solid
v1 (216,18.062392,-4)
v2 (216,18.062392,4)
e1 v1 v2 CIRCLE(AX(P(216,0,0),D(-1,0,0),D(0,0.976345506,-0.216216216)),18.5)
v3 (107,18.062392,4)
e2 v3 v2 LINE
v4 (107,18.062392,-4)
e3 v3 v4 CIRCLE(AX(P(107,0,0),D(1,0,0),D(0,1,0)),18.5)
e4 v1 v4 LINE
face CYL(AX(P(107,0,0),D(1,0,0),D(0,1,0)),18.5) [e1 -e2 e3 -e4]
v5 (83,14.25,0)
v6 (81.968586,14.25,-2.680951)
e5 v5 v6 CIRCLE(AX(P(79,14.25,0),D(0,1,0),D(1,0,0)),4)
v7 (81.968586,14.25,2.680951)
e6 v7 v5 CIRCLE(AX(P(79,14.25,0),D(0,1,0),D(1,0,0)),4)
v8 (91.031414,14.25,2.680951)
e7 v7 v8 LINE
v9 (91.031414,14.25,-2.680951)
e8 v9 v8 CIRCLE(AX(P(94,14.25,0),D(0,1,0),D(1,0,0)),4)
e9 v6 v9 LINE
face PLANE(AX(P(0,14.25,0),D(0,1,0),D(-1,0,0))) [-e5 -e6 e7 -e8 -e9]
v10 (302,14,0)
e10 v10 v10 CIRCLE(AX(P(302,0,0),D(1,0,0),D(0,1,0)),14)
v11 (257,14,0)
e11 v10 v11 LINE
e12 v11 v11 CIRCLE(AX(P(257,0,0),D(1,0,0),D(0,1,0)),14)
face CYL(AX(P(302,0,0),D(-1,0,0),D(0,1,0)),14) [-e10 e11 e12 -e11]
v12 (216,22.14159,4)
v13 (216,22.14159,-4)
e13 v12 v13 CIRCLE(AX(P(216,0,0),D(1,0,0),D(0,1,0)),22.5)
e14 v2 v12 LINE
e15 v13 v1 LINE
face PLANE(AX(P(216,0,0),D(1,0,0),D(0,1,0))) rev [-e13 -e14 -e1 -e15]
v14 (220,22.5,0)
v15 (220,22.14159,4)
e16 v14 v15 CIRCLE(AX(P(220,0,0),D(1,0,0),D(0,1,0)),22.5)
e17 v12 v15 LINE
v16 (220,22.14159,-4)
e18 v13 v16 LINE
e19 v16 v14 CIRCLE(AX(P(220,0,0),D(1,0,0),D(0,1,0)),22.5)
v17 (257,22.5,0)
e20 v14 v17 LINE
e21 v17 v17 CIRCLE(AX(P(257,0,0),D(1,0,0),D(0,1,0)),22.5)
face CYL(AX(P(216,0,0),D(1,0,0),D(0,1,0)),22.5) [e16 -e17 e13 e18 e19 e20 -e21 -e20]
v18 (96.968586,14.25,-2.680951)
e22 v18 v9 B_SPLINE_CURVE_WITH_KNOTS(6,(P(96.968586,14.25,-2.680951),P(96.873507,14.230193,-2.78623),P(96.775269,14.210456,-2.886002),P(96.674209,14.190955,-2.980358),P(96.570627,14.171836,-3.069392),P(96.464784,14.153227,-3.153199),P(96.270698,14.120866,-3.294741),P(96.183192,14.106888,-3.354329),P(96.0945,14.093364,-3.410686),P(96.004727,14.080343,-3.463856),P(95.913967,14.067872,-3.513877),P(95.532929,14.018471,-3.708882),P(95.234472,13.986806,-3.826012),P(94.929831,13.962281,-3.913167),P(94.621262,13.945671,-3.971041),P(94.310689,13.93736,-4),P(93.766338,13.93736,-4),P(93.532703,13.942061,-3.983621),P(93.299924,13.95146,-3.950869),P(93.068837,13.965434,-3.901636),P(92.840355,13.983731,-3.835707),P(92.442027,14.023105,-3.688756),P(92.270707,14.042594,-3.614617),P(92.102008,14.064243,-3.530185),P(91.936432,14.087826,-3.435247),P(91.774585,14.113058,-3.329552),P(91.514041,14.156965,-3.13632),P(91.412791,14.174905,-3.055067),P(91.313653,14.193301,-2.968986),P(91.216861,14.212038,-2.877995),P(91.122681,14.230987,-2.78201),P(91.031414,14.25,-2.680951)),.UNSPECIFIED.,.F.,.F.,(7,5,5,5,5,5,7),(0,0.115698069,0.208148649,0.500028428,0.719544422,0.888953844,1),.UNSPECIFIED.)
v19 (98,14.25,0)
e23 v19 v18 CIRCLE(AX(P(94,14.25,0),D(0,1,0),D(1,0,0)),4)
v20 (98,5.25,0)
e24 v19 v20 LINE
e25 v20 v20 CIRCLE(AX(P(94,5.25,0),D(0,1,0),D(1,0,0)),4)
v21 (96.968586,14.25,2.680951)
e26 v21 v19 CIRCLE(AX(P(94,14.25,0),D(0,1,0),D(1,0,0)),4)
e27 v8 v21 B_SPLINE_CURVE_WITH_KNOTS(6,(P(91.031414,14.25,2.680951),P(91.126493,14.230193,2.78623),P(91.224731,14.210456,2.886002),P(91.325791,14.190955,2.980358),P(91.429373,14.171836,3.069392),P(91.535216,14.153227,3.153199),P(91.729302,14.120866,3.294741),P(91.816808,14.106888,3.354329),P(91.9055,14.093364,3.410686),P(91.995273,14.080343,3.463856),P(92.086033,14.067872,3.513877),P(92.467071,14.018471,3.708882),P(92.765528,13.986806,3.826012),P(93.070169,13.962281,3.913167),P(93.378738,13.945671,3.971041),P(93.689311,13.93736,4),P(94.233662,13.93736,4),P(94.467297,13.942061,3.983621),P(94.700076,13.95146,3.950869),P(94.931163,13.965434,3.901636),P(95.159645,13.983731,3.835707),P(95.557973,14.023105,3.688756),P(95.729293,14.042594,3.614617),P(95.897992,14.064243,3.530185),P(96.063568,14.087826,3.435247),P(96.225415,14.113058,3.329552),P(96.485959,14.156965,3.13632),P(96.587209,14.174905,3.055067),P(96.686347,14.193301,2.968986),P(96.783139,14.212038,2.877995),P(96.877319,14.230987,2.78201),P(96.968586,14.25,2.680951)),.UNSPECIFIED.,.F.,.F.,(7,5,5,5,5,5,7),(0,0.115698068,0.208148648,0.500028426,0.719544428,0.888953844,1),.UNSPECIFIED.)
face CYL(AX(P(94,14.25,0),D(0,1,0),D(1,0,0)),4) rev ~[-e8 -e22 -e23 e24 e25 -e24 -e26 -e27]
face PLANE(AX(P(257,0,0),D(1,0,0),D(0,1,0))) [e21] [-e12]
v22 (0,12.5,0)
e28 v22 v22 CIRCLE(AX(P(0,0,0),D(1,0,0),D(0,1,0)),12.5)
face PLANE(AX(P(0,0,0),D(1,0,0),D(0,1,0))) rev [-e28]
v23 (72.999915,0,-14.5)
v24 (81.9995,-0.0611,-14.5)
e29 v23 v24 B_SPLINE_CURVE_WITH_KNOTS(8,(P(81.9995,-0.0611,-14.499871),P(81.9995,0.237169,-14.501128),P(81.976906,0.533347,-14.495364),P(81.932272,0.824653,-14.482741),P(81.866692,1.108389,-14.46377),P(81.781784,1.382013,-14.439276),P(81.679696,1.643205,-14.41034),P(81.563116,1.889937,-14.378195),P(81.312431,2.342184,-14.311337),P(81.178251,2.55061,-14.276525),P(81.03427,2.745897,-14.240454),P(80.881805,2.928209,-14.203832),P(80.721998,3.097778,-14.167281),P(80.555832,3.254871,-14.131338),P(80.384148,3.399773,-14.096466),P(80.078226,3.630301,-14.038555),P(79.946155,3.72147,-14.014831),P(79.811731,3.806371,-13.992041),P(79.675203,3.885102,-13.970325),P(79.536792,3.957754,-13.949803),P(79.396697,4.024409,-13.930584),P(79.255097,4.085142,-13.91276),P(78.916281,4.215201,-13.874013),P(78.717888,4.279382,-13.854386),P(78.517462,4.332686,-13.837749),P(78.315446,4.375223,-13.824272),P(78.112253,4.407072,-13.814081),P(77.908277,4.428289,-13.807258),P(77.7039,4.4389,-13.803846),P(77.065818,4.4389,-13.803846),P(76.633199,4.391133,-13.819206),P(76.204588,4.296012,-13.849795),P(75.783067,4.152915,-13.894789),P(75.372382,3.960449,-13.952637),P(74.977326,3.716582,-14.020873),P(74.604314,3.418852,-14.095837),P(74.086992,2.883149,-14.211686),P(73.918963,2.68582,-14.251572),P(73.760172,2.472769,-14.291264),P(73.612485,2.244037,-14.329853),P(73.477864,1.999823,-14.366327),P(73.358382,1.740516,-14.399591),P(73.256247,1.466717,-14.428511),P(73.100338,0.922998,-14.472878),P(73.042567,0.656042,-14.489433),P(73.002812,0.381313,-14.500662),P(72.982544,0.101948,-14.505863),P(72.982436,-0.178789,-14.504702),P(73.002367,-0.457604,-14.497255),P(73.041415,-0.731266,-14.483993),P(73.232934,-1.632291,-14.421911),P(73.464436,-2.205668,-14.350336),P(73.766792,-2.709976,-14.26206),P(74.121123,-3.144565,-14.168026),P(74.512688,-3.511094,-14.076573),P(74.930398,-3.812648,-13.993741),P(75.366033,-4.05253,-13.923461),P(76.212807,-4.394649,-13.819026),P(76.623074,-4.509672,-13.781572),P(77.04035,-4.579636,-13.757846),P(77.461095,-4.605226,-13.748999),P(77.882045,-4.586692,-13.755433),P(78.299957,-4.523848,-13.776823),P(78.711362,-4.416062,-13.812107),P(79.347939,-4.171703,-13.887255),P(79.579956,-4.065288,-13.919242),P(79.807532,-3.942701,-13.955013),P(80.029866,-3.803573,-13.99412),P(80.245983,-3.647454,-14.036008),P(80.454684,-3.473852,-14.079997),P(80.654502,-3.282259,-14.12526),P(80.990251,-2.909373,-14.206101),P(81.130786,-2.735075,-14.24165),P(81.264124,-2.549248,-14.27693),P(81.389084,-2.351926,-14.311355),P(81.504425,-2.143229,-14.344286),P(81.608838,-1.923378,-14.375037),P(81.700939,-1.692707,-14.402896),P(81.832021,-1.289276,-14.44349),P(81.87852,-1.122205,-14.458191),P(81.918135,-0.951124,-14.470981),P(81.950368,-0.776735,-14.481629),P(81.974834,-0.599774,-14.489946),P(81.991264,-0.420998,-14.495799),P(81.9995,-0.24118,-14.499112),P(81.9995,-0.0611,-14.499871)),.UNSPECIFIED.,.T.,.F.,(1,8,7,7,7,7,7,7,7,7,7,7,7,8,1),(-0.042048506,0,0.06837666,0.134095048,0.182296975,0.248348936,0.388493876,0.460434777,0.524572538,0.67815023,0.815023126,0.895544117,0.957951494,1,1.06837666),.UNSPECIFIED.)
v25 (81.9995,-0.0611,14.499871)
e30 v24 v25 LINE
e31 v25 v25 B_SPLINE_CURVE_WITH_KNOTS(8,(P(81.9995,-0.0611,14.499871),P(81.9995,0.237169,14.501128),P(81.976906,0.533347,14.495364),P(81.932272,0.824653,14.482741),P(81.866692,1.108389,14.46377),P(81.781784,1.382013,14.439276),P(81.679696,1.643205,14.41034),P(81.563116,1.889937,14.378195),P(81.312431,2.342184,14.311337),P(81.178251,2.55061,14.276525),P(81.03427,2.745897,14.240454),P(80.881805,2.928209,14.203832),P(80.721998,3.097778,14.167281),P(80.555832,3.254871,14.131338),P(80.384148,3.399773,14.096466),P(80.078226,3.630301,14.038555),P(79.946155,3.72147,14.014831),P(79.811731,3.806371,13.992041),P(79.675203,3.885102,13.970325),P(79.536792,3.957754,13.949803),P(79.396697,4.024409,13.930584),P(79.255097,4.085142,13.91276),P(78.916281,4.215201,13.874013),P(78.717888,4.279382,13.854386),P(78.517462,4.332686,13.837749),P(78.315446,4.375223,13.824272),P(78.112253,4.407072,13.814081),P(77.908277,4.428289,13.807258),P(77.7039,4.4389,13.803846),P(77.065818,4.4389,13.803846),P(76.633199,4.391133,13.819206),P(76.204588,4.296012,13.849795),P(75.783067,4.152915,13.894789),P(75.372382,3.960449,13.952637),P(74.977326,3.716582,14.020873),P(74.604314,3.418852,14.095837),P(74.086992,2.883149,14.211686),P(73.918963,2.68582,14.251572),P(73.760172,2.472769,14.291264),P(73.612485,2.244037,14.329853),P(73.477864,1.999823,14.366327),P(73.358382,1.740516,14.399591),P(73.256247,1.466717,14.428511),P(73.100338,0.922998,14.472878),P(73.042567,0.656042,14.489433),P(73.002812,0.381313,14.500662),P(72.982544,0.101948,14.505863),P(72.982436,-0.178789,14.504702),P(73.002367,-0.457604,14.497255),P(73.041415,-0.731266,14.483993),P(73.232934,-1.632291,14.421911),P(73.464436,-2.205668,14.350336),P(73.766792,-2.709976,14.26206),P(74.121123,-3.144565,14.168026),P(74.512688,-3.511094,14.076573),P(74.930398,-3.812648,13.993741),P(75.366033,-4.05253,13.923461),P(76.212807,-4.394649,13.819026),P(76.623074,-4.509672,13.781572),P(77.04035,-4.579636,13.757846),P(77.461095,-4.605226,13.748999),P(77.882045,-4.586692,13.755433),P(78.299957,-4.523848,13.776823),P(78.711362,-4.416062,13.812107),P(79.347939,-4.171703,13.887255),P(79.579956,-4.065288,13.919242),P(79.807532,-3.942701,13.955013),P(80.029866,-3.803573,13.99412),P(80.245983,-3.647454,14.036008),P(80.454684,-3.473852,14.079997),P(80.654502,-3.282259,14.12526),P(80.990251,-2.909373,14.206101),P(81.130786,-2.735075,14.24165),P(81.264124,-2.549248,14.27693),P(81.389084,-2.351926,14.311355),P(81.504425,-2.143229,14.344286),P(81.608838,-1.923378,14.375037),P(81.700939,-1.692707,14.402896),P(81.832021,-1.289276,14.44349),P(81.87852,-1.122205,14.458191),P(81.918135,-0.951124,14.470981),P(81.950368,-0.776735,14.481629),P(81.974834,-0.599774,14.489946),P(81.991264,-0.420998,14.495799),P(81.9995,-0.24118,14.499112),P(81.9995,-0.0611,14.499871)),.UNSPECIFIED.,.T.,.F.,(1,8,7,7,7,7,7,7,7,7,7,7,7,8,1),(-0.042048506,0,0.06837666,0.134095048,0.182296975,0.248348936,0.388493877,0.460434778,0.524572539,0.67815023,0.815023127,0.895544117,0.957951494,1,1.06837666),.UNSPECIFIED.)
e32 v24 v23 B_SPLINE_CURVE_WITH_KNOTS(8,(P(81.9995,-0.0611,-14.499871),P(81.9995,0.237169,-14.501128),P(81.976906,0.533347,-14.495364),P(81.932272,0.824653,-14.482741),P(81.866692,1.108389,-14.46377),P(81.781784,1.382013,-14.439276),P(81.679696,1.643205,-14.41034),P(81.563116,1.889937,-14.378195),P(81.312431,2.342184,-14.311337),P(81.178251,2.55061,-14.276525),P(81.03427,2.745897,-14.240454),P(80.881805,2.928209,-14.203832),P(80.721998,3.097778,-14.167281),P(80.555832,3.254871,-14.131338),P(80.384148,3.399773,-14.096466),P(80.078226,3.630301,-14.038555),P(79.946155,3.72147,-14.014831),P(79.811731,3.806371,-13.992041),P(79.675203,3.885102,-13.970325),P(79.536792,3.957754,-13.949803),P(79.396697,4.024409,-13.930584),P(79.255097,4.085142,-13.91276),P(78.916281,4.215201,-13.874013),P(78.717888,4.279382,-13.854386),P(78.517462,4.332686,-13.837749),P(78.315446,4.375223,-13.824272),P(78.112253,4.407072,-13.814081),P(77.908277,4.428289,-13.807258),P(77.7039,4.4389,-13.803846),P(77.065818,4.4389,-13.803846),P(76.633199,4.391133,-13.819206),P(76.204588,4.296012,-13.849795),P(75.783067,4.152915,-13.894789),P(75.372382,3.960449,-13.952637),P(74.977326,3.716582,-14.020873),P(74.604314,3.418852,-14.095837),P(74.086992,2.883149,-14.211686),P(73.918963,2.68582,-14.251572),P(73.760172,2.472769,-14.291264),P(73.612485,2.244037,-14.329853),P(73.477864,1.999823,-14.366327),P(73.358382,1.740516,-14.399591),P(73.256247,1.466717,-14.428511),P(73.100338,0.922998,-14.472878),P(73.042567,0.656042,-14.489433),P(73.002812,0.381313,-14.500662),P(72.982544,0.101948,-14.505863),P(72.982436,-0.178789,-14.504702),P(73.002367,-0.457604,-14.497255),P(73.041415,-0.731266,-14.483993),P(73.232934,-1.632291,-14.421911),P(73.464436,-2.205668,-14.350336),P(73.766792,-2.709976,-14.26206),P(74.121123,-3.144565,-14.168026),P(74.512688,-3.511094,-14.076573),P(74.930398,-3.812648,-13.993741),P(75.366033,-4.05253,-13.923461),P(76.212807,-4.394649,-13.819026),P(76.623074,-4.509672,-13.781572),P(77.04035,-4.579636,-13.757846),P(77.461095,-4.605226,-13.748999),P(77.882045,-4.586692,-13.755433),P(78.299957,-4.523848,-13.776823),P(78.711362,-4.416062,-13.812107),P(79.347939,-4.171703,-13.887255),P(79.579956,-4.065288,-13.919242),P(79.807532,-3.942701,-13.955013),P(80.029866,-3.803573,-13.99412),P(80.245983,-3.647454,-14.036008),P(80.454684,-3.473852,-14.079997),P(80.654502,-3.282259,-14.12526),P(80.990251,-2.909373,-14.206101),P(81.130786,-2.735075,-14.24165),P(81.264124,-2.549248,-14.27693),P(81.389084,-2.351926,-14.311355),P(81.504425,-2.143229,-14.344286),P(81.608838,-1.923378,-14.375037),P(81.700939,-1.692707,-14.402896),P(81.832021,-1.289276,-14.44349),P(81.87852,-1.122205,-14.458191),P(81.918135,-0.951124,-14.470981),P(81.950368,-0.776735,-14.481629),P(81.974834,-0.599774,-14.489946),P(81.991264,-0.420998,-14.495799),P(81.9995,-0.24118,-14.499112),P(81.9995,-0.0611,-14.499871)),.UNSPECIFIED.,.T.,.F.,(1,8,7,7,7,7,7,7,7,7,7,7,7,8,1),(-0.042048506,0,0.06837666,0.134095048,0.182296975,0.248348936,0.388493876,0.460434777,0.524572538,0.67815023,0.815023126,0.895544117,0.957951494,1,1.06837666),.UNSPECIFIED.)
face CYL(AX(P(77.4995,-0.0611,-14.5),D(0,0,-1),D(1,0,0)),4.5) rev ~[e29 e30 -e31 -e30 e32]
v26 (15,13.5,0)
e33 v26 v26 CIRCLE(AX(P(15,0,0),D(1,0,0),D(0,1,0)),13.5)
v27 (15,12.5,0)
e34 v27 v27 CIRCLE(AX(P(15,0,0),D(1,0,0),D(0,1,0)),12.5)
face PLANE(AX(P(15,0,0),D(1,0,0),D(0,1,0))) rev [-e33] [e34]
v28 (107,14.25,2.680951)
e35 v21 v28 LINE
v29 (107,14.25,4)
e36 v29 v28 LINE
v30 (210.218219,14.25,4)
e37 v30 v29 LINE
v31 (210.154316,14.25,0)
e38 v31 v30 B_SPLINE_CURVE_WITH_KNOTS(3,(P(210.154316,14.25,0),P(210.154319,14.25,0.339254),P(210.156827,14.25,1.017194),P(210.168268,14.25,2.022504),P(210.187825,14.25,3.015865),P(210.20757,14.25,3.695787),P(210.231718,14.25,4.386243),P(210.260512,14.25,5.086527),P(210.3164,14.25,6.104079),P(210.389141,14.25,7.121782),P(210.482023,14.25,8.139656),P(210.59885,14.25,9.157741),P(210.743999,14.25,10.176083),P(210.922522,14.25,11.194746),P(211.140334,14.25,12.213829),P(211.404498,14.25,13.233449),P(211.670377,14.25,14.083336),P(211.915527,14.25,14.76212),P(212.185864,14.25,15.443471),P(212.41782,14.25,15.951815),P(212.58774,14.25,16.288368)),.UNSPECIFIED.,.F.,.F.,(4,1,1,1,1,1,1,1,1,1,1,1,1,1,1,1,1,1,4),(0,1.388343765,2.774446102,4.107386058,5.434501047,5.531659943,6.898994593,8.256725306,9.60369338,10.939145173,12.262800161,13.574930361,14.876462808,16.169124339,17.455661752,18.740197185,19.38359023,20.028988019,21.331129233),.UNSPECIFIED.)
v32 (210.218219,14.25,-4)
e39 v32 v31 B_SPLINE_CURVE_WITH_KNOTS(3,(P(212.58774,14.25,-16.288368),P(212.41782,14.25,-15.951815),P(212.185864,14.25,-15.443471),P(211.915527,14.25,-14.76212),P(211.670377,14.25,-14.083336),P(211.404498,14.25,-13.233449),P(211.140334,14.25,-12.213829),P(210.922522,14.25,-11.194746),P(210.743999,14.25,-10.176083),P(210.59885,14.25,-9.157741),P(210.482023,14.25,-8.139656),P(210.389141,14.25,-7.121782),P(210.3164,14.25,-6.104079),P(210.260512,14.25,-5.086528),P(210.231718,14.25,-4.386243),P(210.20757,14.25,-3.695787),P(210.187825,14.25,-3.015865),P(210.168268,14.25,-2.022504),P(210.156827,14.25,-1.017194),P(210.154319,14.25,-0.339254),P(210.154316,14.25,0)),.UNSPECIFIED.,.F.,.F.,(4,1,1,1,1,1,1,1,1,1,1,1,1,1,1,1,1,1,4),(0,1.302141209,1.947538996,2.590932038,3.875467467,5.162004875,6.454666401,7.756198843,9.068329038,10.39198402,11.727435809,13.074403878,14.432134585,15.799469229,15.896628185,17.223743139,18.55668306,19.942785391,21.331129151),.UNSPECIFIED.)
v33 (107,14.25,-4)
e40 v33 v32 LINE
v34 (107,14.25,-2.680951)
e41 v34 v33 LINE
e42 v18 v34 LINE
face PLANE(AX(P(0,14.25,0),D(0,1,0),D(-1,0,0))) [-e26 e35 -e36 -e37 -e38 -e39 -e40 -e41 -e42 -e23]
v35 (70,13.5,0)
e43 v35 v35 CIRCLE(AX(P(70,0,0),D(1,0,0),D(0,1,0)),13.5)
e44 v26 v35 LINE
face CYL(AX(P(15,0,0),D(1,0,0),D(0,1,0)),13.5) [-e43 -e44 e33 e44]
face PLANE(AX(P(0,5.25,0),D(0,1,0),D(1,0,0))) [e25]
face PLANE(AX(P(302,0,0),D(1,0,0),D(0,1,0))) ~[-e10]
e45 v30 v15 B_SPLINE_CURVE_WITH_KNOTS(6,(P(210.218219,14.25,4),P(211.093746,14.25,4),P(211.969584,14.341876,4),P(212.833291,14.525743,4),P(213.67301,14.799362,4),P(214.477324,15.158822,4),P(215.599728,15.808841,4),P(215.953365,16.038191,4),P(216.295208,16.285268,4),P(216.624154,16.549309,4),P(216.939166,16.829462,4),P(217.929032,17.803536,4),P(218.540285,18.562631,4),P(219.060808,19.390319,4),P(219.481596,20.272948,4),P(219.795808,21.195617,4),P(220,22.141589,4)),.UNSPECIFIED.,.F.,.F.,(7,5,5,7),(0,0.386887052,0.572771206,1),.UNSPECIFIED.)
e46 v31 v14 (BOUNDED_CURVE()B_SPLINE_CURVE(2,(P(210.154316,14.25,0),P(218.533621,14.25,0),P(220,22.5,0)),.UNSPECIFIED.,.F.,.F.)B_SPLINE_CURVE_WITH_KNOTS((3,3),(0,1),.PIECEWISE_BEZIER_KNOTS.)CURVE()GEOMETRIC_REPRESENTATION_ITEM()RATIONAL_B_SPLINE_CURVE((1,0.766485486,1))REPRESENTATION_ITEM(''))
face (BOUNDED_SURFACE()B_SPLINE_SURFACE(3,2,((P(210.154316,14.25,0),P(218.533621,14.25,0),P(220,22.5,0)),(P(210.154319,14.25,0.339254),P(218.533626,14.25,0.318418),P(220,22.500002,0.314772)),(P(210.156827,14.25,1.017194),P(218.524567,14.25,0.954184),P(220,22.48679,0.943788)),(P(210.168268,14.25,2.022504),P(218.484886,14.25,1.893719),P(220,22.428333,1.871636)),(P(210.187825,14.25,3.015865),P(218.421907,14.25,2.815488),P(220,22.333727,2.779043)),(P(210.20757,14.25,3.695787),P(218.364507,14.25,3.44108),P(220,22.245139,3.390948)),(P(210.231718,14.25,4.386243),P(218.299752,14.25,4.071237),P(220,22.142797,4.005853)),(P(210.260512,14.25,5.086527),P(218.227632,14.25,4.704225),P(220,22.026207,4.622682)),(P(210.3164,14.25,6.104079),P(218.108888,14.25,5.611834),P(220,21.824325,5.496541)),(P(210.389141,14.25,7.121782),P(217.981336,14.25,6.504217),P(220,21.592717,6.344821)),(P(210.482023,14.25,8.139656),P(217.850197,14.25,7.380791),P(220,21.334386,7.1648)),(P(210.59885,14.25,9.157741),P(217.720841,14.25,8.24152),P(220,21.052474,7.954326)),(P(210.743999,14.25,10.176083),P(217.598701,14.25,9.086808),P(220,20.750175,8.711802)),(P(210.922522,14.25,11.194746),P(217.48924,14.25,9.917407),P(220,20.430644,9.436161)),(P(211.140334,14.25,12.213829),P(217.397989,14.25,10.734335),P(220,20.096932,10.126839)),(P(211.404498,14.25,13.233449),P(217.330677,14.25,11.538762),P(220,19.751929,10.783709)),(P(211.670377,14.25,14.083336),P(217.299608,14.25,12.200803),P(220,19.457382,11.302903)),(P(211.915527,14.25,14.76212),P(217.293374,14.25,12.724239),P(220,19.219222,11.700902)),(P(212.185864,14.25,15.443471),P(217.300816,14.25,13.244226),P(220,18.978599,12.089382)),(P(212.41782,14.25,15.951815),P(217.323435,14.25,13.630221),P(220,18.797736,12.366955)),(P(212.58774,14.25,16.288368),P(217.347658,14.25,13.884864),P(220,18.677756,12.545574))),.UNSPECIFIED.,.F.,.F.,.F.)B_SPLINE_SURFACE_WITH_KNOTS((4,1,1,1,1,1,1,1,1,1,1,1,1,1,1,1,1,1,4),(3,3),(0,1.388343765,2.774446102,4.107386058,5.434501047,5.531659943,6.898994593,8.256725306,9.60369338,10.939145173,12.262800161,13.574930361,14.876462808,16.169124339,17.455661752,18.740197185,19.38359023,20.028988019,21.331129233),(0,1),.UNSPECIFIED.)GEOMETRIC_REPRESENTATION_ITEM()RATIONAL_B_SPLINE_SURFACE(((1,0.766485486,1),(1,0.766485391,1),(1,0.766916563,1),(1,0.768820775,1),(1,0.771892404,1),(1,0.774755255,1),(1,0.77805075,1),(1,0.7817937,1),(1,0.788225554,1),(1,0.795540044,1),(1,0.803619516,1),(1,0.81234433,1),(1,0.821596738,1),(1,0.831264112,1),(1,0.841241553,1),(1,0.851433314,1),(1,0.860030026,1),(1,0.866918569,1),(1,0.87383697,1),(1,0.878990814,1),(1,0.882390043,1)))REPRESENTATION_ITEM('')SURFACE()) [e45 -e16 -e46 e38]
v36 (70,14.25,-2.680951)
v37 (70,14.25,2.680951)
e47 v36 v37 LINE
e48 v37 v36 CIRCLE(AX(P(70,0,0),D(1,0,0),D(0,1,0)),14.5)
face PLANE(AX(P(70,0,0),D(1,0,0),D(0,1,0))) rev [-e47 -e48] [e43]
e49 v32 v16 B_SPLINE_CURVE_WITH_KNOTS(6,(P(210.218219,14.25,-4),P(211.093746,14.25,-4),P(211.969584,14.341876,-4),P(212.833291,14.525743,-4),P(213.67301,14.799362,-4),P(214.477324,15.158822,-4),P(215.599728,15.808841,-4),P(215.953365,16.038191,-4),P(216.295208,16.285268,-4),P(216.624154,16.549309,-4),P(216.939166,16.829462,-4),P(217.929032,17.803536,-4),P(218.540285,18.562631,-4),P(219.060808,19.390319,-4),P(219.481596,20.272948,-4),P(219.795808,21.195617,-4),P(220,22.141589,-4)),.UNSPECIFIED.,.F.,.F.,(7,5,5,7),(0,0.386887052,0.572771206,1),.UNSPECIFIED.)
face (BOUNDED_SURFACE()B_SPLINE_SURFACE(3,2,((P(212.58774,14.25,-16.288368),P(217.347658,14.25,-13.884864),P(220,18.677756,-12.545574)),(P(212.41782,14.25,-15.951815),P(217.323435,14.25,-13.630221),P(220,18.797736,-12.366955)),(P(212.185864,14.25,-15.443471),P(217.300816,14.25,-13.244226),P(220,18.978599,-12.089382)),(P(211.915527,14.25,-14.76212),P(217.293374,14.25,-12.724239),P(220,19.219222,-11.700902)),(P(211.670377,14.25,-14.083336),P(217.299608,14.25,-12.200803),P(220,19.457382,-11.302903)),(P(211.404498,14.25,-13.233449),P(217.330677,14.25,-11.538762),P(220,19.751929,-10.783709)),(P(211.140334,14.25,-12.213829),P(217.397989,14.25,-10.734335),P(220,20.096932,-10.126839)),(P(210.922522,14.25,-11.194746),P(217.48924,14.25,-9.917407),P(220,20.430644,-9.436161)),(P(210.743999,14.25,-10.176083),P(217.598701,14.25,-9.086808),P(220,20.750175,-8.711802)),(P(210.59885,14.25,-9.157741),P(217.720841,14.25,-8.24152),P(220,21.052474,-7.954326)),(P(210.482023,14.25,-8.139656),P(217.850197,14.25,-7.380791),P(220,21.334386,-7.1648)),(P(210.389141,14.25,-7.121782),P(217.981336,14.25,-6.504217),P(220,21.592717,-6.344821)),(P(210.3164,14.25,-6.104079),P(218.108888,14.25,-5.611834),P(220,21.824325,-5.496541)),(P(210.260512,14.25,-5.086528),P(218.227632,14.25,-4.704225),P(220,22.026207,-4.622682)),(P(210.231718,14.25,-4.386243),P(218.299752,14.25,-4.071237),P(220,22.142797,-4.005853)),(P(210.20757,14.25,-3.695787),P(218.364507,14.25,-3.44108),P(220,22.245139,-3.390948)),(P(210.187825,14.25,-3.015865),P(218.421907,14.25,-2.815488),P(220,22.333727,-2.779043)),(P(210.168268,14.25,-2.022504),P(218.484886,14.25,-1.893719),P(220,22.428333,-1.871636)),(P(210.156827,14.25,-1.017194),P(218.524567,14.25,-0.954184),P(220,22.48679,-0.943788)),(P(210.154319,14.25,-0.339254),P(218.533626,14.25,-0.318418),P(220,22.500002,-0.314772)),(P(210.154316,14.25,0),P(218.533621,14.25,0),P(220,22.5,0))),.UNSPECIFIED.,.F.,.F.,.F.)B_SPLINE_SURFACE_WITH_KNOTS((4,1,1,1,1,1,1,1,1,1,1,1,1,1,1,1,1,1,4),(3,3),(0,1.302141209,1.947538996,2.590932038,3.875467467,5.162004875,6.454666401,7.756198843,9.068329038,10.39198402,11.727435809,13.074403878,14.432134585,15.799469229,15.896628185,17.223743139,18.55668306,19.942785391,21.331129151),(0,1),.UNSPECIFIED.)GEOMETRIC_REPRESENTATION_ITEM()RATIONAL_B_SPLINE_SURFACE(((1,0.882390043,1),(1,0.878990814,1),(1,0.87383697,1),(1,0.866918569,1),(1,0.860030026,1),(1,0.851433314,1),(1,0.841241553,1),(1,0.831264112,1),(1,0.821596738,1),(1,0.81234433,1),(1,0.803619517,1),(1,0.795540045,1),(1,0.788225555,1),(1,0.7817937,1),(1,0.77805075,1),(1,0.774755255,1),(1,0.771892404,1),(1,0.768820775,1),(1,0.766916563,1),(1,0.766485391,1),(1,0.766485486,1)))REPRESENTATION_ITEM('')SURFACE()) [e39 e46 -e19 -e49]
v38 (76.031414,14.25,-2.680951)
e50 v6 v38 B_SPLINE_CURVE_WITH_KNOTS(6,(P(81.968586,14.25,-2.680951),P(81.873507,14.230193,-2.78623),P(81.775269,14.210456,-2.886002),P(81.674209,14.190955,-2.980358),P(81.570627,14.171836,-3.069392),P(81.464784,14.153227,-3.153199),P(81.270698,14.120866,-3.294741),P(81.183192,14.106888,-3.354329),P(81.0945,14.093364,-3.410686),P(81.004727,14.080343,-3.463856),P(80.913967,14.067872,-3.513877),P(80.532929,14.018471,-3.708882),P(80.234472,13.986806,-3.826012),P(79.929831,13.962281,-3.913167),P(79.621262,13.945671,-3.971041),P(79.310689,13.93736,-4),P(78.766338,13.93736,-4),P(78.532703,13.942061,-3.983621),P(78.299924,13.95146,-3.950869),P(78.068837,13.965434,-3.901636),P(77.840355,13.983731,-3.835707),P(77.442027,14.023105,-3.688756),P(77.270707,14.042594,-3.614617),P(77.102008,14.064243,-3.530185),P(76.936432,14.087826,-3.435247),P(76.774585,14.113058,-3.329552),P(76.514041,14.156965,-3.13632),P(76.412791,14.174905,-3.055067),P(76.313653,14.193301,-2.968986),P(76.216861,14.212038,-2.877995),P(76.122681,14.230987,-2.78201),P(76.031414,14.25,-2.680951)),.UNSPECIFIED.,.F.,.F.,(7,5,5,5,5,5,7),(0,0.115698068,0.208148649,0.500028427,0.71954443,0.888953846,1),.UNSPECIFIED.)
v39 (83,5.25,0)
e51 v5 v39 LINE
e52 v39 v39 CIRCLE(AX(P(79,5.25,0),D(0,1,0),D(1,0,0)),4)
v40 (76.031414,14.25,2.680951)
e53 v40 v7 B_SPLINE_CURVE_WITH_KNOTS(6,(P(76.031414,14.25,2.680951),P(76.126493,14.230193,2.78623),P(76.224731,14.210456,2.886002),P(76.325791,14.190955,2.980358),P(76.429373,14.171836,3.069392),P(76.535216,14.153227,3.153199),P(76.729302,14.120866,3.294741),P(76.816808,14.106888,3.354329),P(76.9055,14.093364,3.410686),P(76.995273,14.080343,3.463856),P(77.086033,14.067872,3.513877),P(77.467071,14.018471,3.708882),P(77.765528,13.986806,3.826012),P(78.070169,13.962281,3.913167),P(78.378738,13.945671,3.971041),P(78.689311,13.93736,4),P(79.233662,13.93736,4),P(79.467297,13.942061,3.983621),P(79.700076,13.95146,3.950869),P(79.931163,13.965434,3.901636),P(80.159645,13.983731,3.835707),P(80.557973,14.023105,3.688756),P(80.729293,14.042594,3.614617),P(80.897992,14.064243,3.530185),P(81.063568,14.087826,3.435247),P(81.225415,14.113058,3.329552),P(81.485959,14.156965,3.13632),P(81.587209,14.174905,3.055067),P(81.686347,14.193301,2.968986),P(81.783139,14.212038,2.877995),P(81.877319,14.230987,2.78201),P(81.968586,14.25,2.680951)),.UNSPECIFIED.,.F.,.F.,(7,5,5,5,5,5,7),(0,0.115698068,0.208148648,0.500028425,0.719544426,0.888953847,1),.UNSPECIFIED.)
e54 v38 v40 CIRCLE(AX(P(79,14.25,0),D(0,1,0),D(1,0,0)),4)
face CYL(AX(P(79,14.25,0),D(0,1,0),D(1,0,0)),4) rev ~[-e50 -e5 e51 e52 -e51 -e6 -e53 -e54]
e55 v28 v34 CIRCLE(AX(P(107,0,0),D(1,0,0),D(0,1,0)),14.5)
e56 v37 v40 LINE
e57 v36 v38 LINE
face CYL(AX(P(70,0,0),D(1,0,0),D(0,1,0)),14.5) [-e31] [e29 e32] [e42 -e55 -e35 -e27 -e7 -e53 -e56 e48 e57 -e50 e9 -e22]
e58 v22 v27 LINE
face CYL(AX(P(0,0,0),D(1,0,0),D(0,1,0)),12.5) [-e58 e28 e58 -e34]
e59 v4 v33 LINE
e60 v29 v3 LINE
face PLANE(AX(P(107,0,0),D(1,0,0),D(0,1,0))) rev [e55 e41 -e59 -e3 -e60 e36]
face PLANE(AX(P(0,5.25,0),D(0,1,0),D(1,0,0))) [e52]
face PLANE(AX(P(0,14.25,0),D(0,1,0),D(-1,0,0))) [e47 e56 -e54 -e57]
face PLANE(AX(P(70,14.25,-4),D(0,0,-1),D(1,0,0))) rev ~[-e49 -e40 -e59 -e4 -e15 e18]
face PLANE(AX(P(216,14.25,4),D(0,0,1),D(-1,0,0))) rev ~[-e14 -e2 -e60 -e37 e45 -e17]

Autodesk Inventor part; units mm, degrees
sketch "Sketch1" plane through (0, 0, 0) normal (0, 0, 1) x (1, 0, 0)
  line L0 (0, 0) -> (302, 0)
  line L1 (0, 0) -> (0, 12.5)
  line L2 (0, 12.5) -> (15, 12.5)
  line L3 (15, 12.5) -> (15, 13.5)
  line L4 (15, 13.5) -> (70, 13.5)
  line L5 (70, 13.5) -> (70, 14.5)
  line L6 (70, 14.5) -> (107, 14.5)
  line L7 (107, 14.5) -> (107, 18.5)
  line L8 (107, 18.5) -> (216, 18.5)
  line L9 (216, 18.5) -> (216, 22.5)
  line L10 (302, 0) -> (302, 14)
  line L11 (302, 14) -> (257, 14)
  line L12 (216, 22.5) -> (257, 22.5)
  line L13 (257, 22.5) -> (257, 14)
  dimension "d0" = 302
  dimension "d1" = 12.5
  dimension "d2" = 15
  dimension "d3" = 1
  dimension "d4" = 55
  dimension "d5" = 1
  dimension "d6" = 37
  dimension "d7" = 4
  dimension "d8" = 109
  dimension "d9" = 4
  dimension "d10" = 14
  dimension "d11" = 45
revolve "Revolution1" add sketch "Sketch1" angle 360 about axis through (0, 0, 0) along (1, 0, 0)
ref_plane "Work Plane1" through (0, 17.5, 0) normal (0, 1, 0) x (-1, 0, 0)
ref_plane "Work Plane2" through (0, 14.25, 0) normal (0, 1, 0) x (-1, 0, 0)
sketch "Sketch3" plane through (0, 14.25, 0) normal (0, 1, 0) x (-1, 0, 0)
  line L0 (-70, -4) -> (-220, -4)
  line L1 (-220, -4) -> (-220, 4)
  line L2 (-216, 22.5) -> (-216, -22.5) projected
  line L3 (-220, 4) -> (-70, 4)
  line L4 (-70, -4) -> (-70, 4)
  line L5 (-70, 14.5) -> (-70, -14.5) projected
  point P0 (0, 0)
  dimension "d17" = 150
  dimension "d18" = 8
  dimension "d19" = 150
extrude "Extrusion1" cut sketch "Sketch3" along normal blind 10
fillet "Fillet1" radius 10 1 edges at (220, 14.25, 0)
sketch "Sketch4" plane through (0, 14.25, 0) normal (0, 1, 0) x (1, 0, 0)
  circle A0 centre (79, 0) radius 4
  circle A1 centre (94, 0) radius 4
  line L0 (70, -2.681) -> (70, 2.681) projected
  point P0 (0, 0)
  dimension "d23" = 8
  dimension "d24" = 8
extrude "Extrusion2" cut sketch "Sketch4" against normal blind 9
ref_plane "Work Plane3" through (0, 0, -14.5) normal (0, 0, 1) x (1, 0, 0)
sketch "Sketch5" plane through (0, 0, -14.5) normal (0, 0, 1) x (1, 0, 0)
  circle A0 centre (77.4995, -0.0611) radius 4.5
  line L0 (70, -14.5) -> (70, 14.25) projected
  point P0 (0, 0)
  dimension "d31" = 9
extrude "Extrusion3" cut sketch "Sketch5" along normal blind 30
properties part number "eixo 2"
